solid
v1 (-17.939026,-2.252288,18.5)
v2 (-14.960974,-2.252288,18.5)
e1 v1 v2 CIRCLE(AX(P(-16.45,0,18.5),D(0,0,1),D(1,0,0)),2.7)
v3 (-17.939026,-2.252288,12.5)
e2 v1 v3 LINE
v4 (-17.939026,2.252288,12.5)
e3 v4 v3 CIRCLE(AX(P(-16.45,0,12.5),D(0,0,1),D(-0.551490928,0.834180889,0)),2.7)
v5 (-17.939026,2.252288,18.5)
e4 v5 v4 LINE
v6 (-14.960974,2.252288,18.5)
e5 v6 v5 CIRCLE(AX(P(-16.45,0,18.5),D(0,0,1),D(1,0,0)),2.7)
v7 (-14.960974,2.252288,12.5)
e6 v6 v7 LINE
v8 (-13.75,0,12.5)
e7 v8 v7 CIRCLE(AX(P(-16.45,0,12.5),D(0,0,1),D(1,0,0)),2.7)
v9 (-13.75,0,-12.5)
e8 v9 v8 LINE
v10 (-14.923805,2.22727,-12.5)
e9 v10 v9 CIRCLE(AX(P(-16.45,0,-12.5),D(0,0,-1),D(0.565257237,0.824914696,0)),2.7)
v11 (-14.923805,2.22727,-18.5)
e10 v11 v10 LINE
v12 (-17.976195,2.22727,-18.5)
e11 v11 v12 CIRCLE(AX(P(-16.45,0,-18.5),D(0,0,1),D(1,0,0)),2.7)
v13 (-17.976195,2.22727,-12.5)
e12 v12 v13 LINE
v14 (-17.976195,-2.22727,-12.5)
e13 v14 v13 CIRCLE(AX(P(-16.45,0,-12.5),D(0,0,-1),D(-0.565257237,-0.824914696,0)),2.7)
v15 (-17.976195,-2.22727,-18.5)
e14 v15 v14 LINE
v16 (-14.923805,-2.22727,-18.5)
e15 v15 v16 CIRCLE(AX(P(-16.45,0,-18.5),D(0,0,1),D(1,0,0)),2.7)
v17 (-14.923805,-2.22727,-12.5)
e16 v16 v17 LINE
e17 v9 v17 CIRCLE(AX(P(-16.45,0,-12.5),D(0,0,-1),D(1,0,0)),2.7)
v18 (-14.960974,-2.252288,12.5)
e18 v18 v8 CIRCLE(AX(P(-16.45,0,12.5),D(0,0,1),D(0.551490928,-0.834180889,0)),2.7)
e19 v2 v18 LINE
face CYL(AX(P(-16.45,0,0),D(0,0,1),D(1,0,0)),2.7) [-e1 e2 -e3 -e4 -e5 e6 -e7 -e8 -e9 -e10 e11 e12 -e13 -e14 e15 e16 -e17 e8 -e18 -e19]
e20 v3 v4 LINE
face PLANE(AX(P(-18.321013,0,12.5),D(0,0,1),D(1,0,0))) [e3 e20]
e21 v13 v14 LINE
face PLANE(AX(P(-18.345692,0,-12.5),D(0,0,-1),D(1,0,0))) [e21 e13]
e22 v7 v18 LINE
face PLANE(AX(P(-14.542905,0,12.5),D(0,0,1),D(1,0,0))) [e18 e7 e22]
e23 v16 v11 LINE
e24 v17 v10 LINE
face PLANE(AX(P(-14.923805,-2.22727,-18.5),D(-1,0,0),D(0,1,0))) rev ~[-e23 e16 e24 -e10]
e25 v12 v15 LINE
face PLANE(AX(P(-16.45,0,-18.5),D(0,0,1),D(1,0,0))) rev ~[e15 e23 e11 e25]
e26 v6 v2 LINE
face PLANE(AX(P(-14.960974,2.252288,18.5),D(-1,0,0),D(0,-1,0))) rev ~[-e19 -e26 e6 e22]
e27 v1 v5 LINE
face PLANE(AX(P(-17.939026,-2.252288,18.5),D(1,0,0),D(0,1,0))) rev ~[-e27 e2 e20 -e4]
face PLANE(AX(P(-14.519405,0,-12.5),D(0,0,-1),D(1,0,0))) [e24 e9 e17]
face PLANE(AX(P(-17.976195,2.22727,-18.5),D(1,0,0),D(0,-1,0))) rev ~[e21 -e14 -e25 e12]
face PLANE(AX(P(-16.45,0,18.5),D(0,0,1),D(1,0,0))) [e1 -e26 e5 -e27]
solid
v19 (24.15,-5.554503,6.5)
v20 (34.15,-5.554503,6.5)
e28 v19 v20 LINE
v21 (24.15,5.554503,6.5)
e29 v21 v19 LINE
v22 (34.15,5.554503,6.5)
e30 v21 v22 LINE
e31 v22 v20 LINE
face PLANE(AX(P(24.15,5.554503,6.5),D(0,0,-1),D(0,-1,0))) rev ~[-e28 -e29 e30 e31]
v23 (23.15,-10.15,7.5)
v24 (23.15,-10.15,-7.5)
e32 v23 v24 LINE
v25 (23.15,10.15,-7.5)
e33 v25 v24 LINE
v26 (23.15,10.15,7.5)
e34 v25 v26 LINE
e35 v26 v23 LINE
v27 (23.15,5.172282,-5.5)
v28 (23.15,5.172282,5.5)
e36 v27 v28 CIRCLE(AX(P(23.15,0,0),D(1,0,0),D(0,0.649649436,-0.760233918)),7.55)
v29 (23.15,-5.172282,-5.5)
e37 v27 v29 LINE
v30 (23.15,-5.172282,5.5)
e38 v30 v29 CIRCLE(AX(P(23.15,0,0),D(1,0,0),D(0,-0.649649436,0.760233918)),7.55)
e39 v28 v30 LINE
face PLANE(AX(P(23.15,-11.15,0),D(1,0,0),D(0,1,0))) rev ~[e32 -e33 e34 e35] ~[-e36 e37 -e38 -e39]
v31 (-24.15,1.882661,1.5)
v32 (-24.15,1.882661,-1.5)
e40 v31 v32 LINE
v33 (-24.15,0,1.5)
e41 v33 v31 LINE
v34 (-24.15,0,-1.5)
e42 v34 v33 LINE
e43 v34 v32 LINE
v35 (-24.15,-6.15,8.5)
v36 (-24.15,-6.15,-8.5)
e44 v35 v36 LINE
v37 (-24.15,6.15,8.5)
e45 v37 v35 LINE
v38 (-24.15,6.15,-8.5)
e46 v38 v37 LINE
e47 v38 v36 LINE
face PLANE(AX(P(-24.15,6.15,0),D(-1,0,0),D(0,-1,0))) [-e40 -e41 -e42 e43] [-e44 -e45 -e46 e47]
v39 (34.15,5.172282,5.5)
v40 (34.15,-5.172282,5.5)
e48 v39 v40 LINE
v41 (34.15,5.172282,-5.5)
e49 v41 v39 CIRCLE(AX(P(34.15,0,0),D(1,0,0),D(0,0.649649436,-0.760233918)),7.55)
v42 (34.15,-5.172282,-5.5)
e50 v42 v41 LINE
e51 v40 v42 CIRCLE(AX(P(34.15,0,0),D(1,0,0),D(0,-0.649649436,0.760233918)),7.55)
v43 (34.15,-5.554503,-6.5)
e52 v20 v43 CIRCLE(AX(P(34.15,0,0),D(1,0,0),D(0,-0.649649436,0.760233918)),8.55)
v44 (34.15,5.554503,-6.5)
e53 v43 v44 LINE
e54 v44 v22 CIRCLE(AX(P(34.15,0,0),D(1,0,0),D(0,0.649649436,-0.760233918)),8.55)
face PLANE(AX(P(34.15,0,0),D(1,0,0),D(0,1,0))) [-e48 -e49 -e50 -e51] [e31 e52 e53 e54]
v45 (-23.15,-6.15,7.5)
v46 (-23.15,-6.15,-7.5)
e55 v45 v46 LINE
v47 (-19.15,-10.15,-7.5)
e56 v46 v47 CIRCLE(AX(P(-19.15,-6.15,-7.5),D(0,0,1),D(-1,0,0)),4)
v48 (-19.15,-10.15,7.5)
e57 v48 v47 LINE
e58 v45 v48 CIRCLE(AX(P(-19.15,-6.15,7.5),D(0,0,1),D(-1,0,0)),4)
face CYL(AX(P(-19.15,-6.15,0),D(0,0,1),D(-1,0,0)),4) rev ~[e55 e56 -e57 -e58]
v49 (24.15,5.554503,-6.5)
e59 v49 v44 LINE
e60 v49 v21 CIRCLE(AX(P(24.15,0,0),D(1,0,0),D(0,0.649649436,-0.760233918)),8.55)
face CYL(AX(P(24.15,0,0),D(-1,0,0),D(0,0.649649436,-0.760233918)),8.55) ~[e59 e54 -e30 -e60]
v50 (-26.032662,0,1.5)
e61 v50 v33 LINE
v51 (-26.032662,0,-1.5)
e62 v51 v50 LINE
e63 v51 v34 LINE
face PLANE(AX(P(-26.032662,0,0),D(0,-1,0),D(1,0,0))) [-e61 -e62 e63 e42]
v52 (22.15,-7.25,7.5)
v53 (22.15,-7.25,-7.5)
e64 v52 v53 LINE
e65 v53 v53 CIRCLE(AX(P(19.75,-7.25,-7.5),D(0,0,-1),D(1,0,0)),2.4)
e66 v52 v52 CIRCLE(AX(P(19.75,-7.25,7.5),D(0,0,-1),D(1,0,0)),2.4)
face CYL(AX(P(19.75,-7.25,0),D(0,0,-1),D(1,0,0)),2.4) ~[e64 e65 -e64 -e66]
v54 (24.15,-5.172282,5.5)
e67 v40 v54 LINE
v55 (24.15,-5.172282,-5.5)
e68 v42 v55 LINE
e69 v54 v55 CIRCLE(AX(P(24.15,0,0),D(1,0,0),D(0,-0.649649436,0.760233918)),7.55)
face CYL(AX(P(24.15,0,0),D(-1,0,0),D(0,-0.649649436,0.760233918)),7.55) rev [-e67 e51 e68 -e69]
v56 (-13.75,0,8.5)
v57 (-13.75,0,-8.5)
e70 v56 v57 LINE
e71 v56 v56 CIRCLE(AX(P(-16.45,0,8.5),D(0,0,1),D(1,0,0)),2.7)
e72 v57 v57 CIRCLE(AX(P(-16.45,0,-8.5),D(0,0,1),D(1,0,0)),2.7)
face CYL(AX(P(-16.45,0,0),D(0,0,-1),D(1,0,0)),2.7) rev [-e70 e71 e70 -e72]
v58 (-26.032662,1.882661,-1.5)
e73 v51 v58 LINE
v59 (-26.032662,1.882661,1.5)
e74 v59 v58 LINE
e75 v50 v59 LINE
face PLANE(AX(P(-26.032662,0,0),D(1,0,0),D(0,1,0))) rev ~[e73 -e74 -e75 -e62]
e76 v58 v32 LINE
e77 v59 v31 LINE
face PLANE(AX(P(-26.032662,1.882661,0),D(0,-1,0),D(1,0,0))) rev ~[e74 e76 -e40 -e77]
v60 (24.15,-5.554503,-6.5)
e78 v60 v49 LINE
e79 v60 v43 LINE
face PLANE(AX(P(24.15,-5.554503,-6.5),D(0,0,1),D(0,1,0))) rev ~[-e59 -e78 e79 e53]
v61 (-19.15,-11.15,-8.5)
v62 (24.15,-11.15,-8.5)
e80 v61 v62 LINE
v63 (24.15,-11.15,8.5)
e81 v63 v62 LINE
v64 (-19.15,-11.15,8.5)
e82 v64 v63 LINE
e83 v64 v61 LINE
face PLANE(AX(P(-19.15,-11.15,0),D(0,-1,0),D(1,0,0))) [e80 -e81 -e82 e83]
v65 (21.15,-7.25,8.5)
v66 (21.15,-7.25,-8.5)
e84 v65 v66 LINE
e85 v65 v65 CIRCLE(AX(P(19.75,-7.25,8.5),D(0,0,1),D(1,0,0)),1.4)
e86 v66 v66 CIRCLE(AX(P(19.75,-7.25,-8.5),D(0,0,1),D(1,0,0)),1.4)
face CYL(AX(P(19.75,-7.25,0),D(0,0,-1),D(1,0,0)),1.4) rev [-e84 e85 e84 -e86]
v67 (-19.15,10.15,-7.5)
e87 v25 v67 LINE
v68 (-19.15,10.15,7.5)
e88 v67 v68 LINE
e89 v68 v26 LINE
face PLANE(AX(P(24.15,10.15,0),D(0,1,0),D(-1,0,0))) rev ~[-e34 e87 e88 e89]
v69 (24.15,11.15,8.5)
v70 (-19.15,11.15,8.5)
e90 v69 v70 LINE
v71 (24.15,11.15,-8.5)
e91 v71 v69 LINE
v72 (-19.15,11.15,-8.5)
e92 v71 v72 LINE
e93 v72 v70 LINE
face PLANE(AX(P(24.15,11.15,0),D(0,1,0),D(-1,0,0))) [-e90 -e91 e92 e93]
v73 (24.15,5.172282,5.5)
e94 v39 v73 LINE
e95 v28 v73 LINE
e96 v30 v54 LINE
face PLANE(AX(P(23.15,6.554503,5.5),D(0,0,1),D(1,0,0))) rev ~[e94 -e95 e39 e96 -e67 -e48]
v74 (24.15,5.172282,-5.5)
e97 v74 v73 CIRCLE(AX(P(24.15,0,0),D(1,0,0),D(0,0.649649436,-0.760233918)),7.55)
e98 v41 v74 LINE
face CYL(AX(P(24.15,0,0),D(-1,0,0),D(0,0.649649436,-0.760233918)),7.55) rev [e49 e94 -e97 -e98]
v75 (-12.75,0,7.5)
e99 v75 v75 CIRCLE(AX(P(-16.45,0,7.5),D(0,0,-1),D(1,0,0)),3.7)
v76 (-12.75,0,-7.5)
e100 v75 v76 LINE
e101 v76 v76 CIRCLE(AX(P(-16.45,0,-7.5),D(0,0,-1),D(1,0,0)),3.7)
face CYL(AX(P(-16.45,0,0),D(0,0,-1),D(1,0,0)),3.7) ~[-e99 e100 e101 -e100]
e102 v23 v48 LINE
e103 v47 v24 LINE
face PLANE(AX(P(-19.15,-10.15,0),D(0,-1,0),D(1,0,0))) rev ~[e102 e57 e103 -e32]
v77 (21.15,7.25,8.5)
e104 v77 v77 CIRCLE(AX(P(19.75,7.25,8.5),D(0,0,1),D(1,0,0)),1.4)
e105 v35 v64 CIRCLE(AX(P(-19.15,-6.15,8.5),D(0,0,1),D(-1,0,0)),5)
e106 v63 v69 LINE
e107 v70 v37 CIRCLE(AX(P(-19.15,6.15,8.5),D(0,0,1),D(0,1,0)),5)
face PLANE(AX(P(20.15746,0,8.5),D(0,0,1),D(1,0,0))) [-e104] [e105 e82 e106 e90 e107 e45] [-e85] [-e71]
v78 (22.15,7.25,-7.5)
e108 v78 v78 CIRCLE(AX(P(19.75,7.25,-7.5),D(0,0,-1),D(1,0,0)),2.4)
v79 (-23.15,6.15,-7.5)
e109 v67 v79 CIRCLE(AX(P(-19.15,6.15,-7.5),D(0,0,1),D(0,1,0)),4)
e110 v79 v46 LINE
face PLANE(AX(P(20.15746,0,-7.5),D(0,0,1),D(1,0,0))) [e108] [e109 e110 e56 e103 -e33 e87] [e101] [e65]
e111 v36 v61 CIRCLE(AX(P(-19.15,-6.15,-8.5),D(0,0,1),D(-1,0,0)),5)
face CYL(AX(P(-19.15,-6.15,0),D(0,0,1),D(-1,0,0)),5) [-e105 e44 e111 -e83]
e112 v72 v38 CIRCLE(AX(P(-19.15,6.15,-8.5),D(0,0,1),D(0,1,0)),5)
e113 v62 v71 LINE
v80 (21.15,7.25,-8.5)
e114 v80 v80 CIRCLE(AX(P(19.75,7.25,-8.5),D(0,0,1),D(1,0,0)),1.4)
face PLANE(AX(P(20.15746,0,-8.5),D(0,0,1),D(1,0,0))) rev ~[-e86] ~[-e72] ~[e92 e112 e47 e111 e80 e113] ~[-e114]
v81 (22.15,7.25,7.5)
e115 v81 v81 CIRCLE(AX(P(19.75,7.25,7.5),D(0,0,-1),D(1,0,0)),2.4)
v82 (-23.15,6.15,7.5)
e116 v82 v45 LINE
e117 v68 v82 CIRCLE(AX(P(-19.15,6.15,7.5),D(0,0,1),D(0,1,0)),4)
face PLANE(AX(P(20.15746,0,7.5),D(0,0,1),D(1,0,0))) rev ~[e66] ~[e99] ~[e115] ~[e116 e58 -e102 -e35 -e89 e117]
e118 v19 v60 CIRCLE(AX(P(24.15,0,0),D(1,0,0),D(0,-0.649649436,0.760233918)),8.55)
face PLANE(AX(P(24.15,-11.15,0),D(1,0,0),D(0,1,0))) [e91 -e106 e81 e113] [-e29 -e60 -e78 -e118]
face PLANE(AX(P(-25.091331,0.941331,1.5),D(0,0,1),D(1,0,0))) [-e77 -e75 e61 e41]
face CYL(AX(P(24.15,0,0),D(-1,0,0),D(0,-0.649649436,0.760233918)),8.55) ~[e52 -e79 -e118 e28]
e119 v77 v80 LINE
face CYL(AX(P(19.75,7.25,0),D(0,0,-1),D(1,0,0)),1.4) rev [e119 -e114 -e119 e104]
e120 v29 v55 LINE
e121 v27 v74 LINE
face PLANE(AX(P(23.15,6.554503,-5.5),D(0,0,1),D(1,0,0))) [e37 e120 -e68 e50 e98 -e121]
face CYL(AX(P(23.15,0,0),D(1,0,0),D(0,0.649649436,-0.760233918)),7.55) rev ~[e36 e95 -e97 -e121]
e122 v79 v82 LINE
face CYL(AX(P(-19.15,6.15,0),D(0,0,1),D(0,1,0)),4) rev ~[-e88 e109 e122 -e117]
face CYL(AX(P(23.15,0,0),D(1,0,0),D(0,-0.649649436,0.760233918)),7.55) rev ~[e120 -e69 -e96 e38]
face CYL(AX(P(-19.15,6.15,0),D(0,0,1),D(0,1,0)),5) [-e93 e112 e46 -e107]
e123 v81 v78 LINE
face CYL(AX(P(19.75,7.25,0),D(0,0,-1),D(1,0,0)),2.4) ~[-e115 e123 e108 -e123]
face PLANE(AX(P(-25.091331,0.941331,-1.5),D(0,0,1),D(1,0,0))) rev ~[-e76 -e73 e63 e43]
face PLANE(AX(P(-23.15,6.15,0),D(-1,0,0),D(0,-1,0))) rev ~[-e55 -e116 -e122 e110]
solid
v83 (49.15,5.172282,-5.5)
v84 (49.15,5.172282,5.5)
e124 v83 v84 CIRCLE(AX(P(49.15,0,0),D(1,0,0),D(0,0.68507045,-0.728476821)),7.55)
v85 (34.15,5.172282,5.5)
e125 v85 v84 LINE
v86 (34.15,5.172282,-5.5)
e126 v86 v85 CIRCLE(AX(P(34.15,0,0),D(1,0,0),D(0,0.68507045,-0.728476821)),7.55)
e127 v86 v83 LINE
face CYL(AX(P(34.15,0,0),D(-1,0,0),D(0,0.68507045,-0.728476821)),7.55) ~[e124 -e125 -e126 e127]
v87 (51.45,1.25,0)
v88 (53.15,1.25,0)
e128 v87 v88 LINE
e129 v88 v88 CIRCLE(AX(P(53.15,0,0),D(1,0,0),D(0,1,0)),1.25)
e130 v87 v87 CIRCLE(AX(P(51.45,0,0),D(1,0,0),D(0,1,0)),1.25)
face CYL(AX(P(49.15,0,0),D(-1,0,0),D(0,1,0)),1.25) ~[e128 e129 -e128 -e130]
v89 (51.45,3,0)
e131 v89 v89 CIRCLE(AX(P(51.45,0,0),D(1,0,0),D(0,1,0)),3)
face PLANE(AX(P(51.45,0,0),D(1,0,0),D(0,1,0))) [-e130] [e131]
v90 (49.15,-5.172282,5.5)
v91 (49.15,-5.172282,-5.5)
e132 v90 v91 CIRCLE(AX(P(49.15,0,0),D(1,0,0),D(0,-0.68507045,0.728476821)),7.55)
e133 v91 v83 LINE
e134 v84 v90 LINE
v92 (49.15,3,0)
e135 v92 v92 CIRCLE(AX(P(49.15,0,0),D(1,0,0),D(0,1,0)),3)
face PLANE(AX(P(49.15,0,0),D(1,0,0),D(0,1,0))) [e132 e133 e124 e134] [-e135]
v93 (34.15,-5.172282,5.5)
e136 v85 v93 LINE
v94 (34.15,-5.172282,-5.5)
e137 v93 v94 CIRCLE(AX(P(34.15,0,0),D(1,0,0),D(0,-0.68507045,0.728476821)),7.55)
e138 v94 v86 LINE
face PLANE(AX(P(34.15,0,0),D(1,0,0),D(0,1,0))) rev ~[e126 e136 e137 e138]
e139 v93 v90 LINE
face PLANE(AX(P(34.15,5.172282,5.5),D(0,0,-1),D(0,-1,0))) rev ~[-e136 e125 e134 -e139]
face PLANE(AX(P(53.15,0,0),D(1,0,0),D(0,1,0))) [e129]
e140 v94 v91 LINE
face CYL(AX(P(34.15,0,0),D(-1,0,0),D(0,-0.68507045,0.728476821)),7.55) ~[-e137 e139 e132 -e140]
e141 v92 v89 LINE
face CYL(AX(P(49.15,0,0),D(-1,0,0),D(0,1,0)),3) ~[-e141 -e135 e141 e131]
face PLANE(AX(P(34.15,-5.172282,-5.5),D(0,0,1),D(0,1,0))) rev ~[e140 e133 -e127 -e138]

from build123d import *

# Parameters (mm, degrees)
F0_W         = 7.9850807097
F0_H         = 22.3
F0_R         = 1.4
F0_R_2       = 2.7
F1_DEPTH     = 8.5
F0_W_2       = 1.8826620857
F0_H_2       = 1.8826614193
F2_DEPTH     = 1.5
F3_DEPTH     = 18.5
F5_DEPTH     = 10
F6_T         = 1
F6_T3_DEPTH  = 13.109005356
F6_T5_DEPTH  = 5
F6_T7_DEPTH  = 3.8826614193
F6_T10_ANGLE = 98.969647871
F6_T12_ANGLE = 98.969647871
F8_DEPTH     = 15
F9_R         = 3
F9_R_2       = 1.25
F10_DEPTH    = 2.3
F11_DEPTH    = 4
F13_DEPTH    = 6
F15_DEPTH    = 6


# Not quite as in the source:
# - a shell that OpenCascade refuses in one call is made with other operations: the cavity is built on its own and cut out


with BuildPart() as f1:
    # F0 (on Top) → F1 (new body, symmetric)
    with BuildSketch(Plane.XY):
        with Locations((20.1574596452, 0)):
            Rectangle(F0_W, F0_H)
        with Locations((19.75, -7.25)):
            Circle(F0_R, mode=Mode.SUBTRACT)
        with Locations((19.75, 7.25)):
            Circle(F0_R, mode=Mode.SUBTRACT)
        with BuildLine():
            Line((-19.15, -11.15), (16.1649192903, -11.15))
            Line((16.1649192903, -11.15), (16.1649192903, 11.15))
            Line((16.1649192903, 11.15), (-19.15, 11.15))
            ThreePointArc((-19.15, 11.15), (-22.6855339059, 9.6855339059), (-24.15, 6.15))
            Line((-24.15, 6.15), (-24.15, 1.8826614193))
            Line((-24.15, 1.8826614193), (-24.15, 0))
            Line((-24.15, 0), (-24.15, -6.15))
            ThreePointArc((-24.15, -6.15), (-22.6855339059, -9.6855339059), (-19.15, -11.15))
        make_face()
        with Locations((-16.45, 0)):
            Circle(F0_R_2, mode=Mode.SUBTRACT)
    extrude(amount=F1_DEPTH, both=True)

    # F0 (on Top) → F2 (join, symmetric)
    with BuildSketch(Plane.XY):
        with Locations((-25.0913310429, 0.9413307097)):
            Rectangle(F0_W_2, F0_H_2)
    extrude(amount=F2_DEPTH, both=True)

    # F4 (on face) → F5 (join)
    with BuildSketch(Plane.YZ.offset(24.15)):
        with BuildLine():
            Line((5.554502678, 6.5), (-5.554502678, 6.5))
            ThreePointArc((-5.554502678, 6.5), (-8.55, 0), (-5.554502678, -6.5))
            Line((-5.554502678, -6.5), (5.554502678, -6.5))
            ThreePointArc((5.554502678, -6.5), (8.55, 0), (5.554502678, 6.5))
        make_face()
    extrude(amount=F5_DEPTH)

    # F6: shell of thickness 1, made by hand


with BuildPart() as f3:
    # F0 (on Top) → F3 (new body, symmetric)
    with BuildSketch(Plane.XY):
        with Locations((-16.45, 0)):
            Circle(F0_R_2)
    extrude(amount=F3_DEPTH, both=True)

    # F12 (on face) → F13 (cut)
    with BuildSketch(Plane.XY.offset(18.5)):
        with BuildLine():
            ThreePointArc((-17.9390255067, 2.2522884008), (-19.15, 0), (-17.9390255067, -2.2522884008))
            Line((-17.9390255067, -2.2522884008), (-17.9390255067, 2.2522884008))
        make_face()
        with BuildLine():
            Line((-14.9609744933, 2.2522884008), (-14.9609744933, -2.2522884008))
            ThreePointArc((-14.9609744933, -2.2522884008), (-14.0719368314, -1.2785990638), (-13.75, 0))
            ThreePointArc((-13.75, 0), (-14.0719368314, 1.2785990638), (-14.9609744933, 2.2522884008))
        make_face()
    extrude(amount=-F13_DEPTH, mode=Mode.SUBTRACT)

    # F14 (on face) → F15 (cut)
    with BuildSketch(Plane(origin=(0, 0, -18.5), x_dir=(1, 0, 0), z_dir=(0, 0, -1))):
        with BuildLine():
            Line((-17.9761945408, -2.2272696792), (-17.9761945408, 2.2272696792))
            ThreePointArc((-17.9761945408, 2.2272696792), (-19.15, 0), (-17.9761945408, -2.2272696792))
        make_face()
        with BuildLine():
            ThreePointArc((-13.75, 0), (-14.0614099075, 1.2588238042), (-14.9238054592, 2.2272696792))
            Line((-14.9238054592, 2.2272696792), (-14.9238054592, -2.2272696792))
            ThreePointArc((-14.9238054592, -2.2272696792), (-14.0614099075, -1.2588238042), (-13.75, 0))
        make_face()
    extrude(amount=-F15_DEPTH, mode=Mode.SUBTRACT)


with BuildPart() as f6_core1:
    # F6_t2: copy of F1
    add(f1.part)

    # the walls: a layer under each face that stays
    f6_faces = [f6_core1.faces().sort_by_distance(p)[0] for p in [
        (24.15, -7.4333333333, -5.6666666667),
        (0, 0, -8.5),
        (2.5, -11.15, 0),
        (2.5, 11.15, 0),
        (0, 0, 8.5),
        (29.15, 0, -6.5),
        (29.15, 8.55, 0),
        (29.15, 0, 6.5),
        (29.15, -8.55, 0),
        (-22.6855339059, 9.6855339059, 0),
        (-24.15, 4.1, -5.6666666667),
        (-22.6855339059, -9.6855339059, 0),
        (18.35, -7.25, 0),
        (18.35, 7.25, 0),
        (-19.15, 0, 0),
        (-25.0913310429, 1.8826614193, 0),
        (-25.0913310429, 0.9413307097, -1.5),
        (-25.0913310429, 0, 0),
        (-25.0913310429, 0.9413307097, 1.5),
        (-26.0326620857, 0.9413307097, 0),
    ]]
    thicken(f6_faces, amount=-F6_T, mode=Mode.SUBTRACT)

    # F6_s4 → F6_t3 (cut)
    with BuildSketch(Plane.XZ.offset(-6.554502678)):
        Polygon((24.16, -6.51), (23.15, -6.5), (23.15, -5.5), (24.15, -5.5), align=None)
        Polygon((24.16, 6.51), (23.15, 6.5), (23.15, 5.5), (24.15, 5.5), align=None)
    extrude(amount=F6_T3_DEPTH, mode=Mode.SUBTRACT)

    # F6_s6 → F6_t5 (cut)
    with BuildSketch(Plane.XY.offset(-2.5)):
        Polygon((-24.16, 1.8926614193), (-23.15, 1.8826614193), (-23.15, 0.8826614193), (-24.15, 0.8826614193), align=None)
        Polygon((-24.16, -0.01), (-23.15, 0), (-23.15, 1), (-24.15, 1), align=None)
    extrude(amount=F6_T5_DEPTH, mode=Mode.SUBTRACT)

    # F6_s8 → F6_t7 (cut)
    with BuildSketch(Plane.XZ.offset(-2.8826614193)):
        Polygon((-24.16, -1.51), (-23.15, -1.5), (-23.15, -0.5), (-24.15, -0.5), align=None)
        Polygon((-24.16, 1.51), (-23.15, 1.5), (-23.15, 0.5), (-24.15, 0.5), align=None)
    extrude(amount=F6_T7_DEPTH, mode=Mode.SUBTRACT)

    # F6_s9 → F6_t10 (revolve, cut)
    with BuildSketch(Plane(origin=(0, 0, 0), x_dir=(1, 0, 0), z_dir=(0, -0.7602339181, -0.649649436))):
        Polygon((24.16, -8.56), (23.15, -8.55), (23.15, -7.55), (24.15, -7.55), align=None)
    revolve(axis=Axis((24.15, 0, 0), (1, 0, 0)), revolution_arc=F6_T10_ANGLE, mode=Mode.SUBTRACT)

    # F6_s11 → F6_t12 (revolve, cut)
    with BuildSketch(Plane(origin=(0, 0, 0), x_dir=(1, 0, 0), z_dir=(0, 0.7602339181, 0.649649436))):
        Polygon((24.16, -8.56), (23.15, -8.55), (23.15, -7.55), (24.15, -7.55), align=None)
    revolve(axis=Axis((24.15, 0, 0), (1, 0, 0)), revolution_arc=F6_T12_ANGLE, mode=Mode.SUBTRACT)


with BuildPart() as f1_1:
    add(f1.part)

    # what is left inside the walls is the cavity
    f6_cavity = [f6_core1.part.solids().sort_by_distance(p)[0] for p in [
        (0, -3.383333, 7.49),
    ]]
    add(f6_cavity, mode=Mode.SUBTRACT)


with BuildPart() as f8:
    # F7 (on face) → F8 (new body)
    with BuildSketch(Plane.YZ.offset(34.15)):
        with BuildLine():
            Line((5.1722818949, 5.5), (-5.1722818949, 5.5))
            ThreePointArc((-5.1722818949, 5.5), (-7.55, 0), (-5.1722818949, -5.5))
            Line((-5.1722818949, -5.5), (5.1722818949, -5.5))
            ThreePointArc((5.1722818949, -5.5), (7.55, 0), (5.1722818949, 5.5))
        make_face()
    extrude(amount=F8_DEPTH)

    # F9 (on face) → F10 (join)
    with BuildSketch(Plane.YZ.offset(49.15)):
        Circle(F9_R)
        Circle(F9_R_2, mode=Mode.SUBTRACT)
    extrude(amount=F10_DEPTH)

    # F11 (add): a face of the model
    f11_faces = [f8.faces().sort_by_distance(p)[0] for p in [
        (49.15, 0, 0),
    ]]
    extrude(f11_faces, amount=F11_DEPTH)


solid = Compound([f3.part, f1_1.part, f8.part])
